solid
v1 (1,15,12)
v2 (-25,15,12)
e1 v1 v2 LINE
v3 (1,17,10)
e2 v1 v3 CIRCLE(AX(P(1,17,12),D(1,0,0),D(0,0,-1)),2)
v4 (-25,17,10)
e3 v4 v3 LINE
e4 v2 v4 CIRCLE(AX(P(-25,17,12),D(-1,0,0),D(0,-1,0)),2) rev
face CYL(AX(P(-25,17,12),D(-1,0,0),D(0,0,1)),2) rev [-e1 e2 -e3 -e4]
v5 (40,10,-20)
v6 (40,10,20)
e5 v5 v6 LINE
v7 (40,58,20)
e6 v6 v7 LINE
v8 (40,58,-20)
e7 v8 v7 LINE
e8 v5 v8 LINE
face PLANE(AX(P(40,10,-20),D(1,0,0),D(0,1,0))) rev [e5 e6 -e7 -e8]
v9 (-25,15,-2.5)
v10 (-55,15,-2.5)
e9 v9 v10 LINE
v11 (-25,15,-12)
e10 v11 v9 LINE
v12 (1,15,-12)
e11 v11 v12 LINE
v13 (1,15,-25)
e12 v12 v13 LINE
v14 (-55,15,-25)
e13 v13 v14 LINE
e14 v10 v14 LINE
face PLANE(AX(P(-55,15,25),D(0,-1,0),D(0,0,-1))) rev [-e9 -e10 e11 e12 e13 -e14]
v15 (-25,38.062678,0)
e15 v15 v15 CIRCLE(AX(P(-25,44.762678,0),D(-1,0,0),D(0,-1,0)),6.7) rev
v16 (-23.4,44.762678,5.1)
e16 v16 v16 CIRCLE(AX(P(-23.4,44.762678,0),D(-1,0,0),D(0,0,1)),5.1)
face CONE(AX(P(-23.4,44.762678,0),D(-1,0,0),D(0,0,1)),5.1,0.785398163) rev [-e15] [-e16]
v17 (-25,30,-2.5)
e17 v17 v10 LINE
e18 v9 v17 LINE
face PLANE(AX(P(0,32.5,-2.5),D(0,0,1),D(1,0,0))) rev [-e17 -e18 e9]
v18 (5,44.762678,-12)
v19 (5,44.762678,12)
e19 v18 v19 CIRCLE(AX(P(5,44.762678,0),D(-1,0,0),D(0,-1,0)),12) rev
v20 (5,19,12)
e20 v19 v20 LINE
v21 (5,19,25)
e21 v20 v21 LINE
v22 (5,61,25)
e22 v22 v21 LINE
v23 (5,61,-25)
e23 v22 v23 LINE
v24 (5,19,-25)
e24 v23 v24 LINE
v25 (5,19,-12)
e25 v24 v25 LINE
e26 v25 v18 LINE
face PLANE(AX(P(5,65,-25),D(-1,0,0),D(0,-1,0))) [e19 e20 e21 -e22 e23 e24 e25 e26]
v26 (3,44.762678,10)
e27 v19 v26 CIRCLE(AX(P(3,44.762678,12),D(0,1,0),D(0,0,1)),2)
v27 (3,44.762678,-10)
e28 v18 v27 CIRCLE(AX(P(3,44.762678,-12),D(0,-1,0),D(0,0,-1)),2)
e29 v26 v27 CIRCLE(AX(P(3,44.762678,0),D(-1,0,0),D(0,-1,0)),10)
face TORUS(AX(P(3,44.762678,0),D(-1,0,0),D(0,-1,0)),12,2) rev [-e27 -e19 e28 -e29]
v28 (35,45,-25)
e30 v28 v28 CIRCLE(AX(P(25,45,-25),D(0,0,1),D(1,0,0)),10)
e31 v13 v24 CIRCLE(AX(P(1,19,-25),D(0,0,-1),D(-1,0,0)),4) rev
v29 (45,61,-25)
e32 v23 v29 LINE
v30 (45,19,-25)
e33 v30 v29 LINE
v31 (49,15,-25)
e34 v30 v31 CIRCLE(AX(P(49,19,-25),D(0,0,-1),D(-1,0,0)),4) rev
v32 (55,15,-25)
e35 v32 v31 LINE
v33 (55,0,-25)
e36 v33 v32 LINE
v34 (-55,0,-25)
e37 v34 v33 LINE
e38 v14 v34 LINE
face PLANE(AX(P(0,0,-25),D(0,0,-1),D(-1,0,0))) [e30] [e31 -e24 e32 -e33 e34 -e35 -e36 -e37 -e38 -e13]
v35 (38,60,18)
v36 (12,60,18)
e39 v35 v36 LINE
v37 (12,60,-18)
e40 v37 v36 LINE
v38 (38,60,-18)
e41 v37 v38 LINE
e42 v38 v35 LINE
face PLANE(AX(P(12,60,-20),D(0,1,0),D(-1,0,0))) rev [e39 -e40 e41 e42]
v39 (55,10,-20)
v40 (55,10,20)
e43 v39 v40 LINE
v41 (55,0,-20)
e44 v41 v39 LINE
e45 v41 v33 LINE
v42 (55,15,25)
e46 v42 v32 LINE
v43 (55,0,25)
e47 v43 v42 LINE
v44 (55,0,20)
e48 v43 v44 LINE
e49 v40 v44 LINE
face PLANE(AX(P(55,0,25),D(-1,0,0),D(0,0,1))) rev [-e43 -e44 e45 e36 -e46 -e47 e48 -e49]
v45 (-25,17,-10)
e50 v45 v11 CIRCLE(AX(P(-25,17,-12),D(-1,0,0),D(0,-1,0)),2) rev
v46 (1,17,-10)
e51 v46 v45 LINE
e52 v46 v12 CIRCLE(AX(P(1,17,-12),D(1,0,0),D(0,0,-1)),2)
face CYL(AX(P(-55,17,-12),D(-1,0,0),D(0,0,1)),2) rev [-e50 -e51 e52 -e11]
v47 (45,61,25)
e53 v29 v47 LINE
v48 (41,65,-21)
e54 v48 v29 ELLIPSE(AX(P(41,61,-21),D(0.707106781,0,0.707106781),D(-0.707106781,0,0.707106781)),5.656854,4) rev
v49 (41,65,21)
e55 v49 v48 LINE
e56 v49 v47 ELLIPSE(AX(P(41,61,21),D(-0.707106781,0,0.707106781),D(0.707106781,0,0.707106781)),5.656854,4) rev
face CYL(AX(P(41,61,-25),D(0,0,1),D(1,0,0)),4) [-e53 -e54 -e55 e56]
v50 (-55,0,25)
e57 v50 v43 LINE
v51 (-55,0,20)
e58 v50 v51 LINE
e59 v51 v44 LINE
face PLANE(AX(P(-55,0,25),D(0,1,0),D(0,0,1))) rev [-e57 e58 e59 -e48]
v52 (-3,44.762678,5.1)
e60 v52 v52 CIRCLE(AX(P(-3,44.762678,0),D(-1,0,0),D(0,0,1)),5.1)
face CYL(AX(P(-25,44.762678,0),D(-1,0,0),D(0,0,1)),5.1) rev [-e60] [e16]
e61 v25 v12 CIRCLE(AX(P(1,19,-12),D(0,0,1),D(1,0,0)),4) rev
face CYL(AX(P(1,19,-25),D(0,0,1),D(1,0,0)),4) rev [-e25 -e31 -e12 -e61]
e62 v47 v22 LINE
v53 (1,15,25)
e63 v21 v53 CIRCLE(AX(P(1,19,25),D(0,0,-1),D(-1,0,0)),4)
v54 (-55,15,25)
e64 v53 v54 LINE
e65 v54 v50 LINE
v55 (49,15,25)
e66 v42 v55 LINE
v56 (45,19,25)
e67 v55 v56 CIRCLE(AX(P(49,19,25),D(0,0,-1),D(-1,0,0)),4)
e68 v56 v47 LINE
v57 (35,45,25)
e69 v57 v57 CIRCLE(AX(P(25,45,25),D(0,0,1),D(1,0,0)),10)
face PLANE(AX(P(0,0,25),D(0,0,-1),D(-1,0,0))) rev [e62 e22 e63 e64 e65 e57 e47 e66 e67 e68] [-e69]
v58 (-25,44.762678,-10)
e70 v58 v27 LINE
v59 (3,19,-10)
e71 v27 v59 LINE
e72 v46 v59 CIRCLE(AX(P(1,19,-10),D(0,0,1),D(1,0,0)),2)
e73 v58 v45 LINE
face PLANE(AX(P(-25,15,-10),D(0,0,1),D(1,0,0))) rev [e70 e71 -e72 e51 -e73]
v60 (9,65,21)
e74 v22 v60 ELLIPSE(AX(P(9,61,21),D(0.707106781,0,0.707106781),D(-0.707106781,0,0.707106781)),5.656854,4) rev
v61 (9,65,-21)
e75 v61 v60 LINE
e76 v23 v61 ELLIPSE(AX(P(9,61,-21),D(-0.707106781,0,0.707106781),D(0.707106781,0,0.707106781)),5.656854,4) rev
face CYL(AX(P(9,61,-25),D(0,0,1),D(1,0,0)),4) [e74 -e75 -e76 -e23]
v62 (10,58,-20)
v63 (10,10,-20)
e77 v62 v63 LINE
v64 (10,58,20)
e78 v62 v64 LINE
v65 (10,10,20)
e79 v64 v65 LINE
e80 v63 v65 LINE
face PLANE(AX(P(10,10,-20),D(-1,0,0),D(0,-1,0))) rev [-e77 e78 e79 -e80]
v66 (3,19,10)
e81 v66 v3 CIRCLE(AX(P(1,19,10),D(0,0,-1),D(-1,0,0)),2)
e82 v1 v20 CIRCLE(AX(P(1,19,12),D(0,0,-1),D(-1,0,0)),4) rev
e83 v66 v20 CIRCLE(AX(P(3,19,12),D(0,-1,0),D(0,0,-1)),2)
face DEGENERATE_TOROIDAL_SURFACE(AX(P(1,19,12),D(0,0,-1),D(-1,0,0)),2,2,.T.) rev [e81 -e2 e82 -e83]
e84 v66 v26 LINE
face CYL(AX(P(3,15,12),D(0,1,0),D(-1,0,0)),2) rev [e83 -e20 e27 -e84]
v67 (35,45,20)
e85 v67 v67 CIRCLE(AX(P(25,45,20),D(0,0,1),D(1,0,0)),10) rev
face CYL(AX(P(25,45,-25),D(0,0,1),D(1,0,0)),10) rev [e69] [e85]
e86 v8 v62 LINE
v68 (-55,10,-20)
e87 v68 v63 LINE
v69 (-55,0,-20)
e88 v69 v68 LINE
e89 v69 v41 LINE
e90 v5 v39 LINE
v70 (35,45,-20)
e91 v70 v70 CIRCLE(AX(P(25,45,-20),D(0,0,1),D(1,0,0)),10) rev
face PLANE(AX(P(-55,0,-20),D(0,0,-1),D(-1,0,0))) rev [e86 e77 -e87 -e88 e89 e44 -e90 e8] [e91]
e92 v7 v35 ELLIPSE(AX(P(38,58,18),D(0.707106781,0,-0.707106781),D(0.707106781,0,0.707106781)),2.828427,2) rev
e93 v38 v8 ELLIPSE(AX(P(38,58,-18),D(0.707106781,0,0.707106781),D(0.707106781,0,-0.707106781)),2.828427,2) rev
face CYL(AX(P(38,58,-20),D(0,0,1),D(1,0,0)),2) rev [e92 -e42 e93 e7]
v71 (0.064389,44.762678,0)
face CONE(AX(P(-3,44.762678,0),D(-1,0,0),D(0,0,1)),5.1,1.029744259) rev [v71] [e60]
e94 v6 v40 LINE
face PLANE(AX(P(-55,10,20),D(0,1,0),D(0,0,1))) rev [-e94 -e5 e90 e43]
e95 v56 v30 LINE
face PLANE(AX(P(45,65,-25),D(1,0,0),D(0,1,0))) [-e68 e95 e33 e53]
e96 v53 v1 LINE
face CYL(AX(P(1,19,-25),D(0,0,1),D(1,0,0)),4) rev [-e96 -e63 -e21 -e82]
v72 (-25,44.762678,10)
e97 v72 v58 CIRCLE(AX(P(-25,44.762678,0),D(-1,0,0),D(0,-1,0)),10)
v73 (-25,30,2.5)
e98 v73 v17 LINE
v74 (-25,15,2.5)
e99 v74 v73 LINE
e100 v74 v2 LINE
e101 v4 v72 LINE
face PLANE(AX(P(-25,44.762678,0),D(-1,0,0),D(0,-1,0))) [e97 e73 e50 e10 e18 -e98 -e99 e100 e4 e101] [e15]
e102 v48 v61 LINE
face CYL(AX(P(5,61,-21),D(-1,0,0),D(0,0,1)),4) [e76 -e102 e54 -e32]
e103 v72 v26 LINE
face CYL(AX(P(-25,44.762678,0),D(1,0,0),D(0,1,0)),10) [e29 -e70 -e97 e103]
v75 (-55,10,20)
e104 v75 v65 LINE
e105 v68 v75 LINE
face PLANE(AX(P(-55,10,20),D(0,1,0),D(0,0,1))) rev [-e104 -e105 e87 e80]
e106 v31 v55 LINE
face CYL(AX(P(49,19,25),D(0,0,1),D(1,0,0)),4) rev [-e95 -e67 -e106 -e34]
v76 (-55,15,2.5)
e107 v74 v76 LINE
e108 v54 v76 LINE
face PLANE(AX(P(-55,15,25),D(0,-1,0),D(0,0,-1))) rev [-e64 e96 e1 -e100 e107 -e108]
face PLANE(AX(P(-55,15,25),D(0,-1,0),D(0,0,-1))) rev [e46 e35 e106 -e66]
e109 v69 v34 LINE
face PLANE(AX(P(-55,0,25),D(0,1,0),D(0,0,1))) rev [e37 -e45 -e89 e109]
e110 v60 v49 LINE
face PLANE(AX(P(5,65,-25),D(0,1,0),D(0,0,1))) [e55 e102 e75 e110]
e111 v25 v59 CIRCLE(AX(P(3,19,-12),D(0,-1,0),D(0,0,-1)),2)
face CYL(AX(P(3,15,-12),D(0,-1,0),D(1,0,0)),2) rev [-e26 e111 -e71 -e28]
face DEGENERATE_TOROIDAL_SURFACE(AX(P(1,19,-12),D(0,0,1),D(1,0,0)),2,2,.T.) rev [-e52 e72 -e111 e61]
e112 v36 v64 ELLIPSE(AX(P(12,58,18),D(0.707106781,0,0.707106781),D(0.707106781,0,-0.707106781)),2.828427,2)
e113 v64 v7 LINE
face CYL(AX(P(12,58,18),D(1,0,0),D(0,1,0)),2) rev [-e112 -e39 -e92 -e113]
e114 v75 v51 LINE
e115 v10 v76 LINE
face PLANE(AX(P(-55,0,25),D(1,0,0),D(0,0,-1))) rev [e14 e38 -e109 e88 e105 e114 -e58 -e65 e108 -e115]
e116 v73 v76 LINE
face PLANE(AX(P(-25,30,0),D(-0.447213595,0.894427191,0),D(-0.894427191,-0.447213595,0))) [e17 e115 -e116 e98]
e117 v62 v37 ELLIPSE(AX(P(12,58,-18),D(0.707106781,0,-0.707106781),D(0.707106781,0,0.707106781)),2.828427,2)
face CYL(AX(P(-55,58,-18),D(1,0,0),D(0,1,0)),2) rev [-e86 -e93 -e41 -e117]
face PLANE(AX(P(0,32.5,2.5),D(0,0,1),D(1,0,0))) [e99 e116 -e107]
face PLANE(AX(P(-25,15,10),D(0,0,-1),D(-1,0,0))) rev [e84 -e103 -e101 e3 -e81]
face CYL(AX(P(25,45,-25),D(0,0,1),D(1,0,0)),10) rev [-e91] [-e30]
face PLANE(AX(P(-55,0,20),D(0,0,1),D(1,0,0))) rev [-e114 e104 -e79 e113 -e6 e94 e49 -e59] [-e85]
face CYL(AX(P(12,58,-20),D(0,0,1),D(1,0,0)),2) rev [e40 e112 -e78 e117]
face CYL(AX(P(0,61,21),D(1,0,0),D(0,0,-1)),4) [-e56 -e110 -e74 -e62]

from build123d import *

# Parameters (mm, degrees)
SKETCH1_W                         = 110
SKETCH1_H                         = 15
BOSS_EXTRUDE1_DEPTH               = 25
SKETCH2_W                         = 40
SKETCH2_H                         = 10
CUT_EXTRUDE1_DEPTH                = 114.798066767
SKETCH3_W                         = 40
SKETCH3_H                         = 50
SKETCH3_R                         = 10
BOSS_EXTRUDE2_DEPTH               = 50
FILLET1_R                         = 4
CUT_EXTRUDE2_DEPTH                = 20
FILLET2_R                         = 2
BOSS_EXTRUDE3_DEPTH               = 30
RIB2_REACH                        = 90.741
SKETCH7_WALL_W                    = 213.023413156
SKETCH7_WALL_H                    = 5
FILLET3_R                         = 2
FILLET4_R                         = 4
TAP_DRILL_FOR_M12X1_75_TAP1_D     = 10.2
TAP_DRILL_FOR_M12X1_75_TAP1_DEPTH = 22
TAP_DRILL_FOR_M12X1_75_TAP1_TIP   = 3.064389157


with BuildPart() as part:
    # Sketch1 → Boss-Extrude1 (new, symmetric)
    with BuildSketch(Plane.XY):
        with Locations((0, 7.5)):
            Rectangle(SKETCH1_W, SKETCH1_H)
    extrude(amount=BOSS_EXTRUDE1_DEPTH, both=True)

    # Sketch2 → Cut-Extrude1 (cut, through all)
    with BuildSketch(Plane(origin=(55, 0, 0), x_dir=(0, 0, -1), z_dir=(1, 0, 0))):
        with Locations((0, 5)):
            Rectangle(SKETCH2_W, SKETCH2_H)
    extrude(amount=-CUT_EXTRUDE1_DEPTH, mode=Mode.SUBTRACT)

    # Sketch3 → Boss-Extrude2 (add)
    with BuildSketch(Plane.XY.offset(25)):
        with Locations((25, 40)):
            Rectangle(SKETCH3_W, SKETCH3_H)
        with Locations((25, 45)):
            Circle(SKETCH3_R, mode=Mode.SUBTRACT)
    extrude(amount=-BOSS_EXTRUDE2_DEPTH)

    # Fillet1
    fillet1_edges = [part.edges().sort_by_distance(p)[0] for p in [
        (25, 65, -25),
        (5, 65, 0),
        (45, 65, 0),
        (45, 15, 0),
        (25, 65, 25),
    ]]
    fillet(fillet1_edges, radius=FILLET1_R)

    # Sketch5 → Cut-Extrude2 (cut, symmetric)
    with BuildSketch(Plane.XY):
        with BuildLine():
            Line((10, 10), (40, 10))
            Line((40, 10), (40, 58))
            ThreePointArc((40, 58), (39.414213562, 59.414213562), (38, 60))
            Line((38, 60), (12, 60))
            ThreePointArc((12, 60), (10.585786438, 59.414213562), (10, 58))
            Line((10, 58), (10, 10))
        make_face()
    extrude(amount=CUT_EXTRUDE2_DEPTH, both=True, mode=Mode.SUBTRACT)

    # Fillet2
    # the kernel refuses this fillet: 2 mm, written as the material it adds along each edge
    with BuildSketch(Plane(origin=(43, 60, 20), x_dir=(0, -1, 0), z_dir=(-1, 0, 0))) as fillet2_piece_1:
        with BuildLine():
            CenterArc((FILLET2_R, -FILLET2_R), FILLET2_R, 90, 90)
            Line((0, -FILLET2_R), (0, 0))
            Line((0, 0), (FILLET2_R, 0))
        make_face()
    extrude(amount=36)
    with BuildSketch(Plane(origin=(43, 60, -20), x_dir=(0, -1, 0), z_dir=(-1, 0, 0))) as fillet2_piece_2:
        with BuildLine():
            CenterArc((FILLET2_R, FILLET2_R), FILLET2_R, 180, 90)
            Line((0, FILLET2_R), (0, 0))
            Line((0, 0), (FILLET2_R, 0))
        make_face()
    extrude(amount=36)

    # Sketch6 → Boss-Extrude3 (add)
    with BuildSketch(Plane.ZY.offset(-5)):
        with BuildLine():
            Line((-10, 15), (10, 15))
            Line((10, 15), (10, 44.76267782))
            ThreePointArc((10, 44.76267782), (0, 54.76267782), (-10, 44.76267782))
            Line((-10, 44.76267782), (-10, 15))
        make_face()
    extrude(amount=BOSS_EXTRUDE3_DEPTH)

    # Sketch7 wall → Rib2 (add, up to next)
    with BuildSketch(Plane(origin=(-40, 22.5, 0), x_dir=(-0.894427191, -0.4472135955, 0), z_dir=(0.4472135955, -0.894427191, 0)), mode=Mode.PRIVATE) as rib2_sk1:
        Rectangle(SKETCH7_WALL_W, SKETCH7_WALL_H)
    rib2_tool1 = extrude(rib2_sk1.sketch, amount=RIB2_REACH, mode=Mode.PRIVATE) - part.part
    add(rib2_tool1.solids().sort_by_distance((-40, 22.5, 0))[0])

    # Fillet3
    fillet3_edges = [part.edges().sort_by_distance(p)[0] for p in [
        (5, 29.88133891, -10),
        (-10, 15, -10),
        (5, 29.88133891, 10),
        (-10, 15, 10),
        (5, 54.76267782, 0),
    ]]
    fillet(fillet3_edges, radius=FILLET3_R)

    # Fillet4
    # the kernel refuses this fillet: 4 mm, written as the material it adds along each edge
    with BuildSketch(Plane(origin=(1, 19, -10), x_dir=(0, -1, 0), z_dir=(-1, 0, 0))) as fillet4_piece_1:
        with BuildLine():
            CenterArc((2, -2), 2, 0, 90)
            Line((4, -2), (4, 0))
            Line((4, 0), (2, 0))
        make_face()
    revolve(axis=Axis((1, 19, -10), (0, 0, 1)), revolution_arc=90)
    with BuildSketch(Plane(origin=(1, 19, 10), x_dir=(1, 0, 0), z_dir=(0, 1, 0))) as fillet4_piece_2:
        with BuildLine():
            CenterArc((2, -2), 2, 0, 90)
            Line((4, -2), (4, 0))
            Line((4, 0), (2, 0))
        make_face()
    revolve(axis=Axis((1, 19, 10), (0, 0, -1)), revolution_arc=90)
    with BuildSketch(Plane(origin=(5, 15, 25), x_dir=(-1, 0, 0), z_dir=(0, 0, -1)), Plane(origin=(5, 15, -10), x_dir=(-1, 0, 0), z_dir=(0, 0, -1))) as fillet4_piece_3:
        with BuildLine():
            CenterArc((FILLET4_R, FILLET4_R), FILLET4_R, 180, 90)
            Line((0, FILLET4_R), (0, 0))
            Line((0, 0), (FILLET4_R, 0))
        make_face()
    extrude(amount=15)

    # Tap Drill for M12x1.75 Tap1
    with Locations(Plane(origin=(-25, 44.76267782, 0), x_dir=(0, -1, 0), z_dir=(-1, 0, 0))):
        with Locations((0, 0)):
            Hole(TAP_DRILL_FOR_M12X1_75_TAP1_D / 2, depth=TAP_DRILL_FOR_M12X1_75_TAP1_DEPTH)
            with Locations((0, 0, -(TAP_DRILL_FOR_M12X1_75_TAP1_DEPTH + TAP_DRILL_FOR_M12X1_75_TAP1_TIP / 2))):  # 118° drill point
                Cone(0, TAP_DRILL_FOR_M12X1_75_TAP1_D / 2, TAP_DRILL_FOR_M12X1_75_TAP1_TIP, mode=Mode.SUBTRACT)

    # Chamfer3: read off the stored shape, not the designer's step
    # Chamfer3 outline → Chamfer3 (revolve, cut)
    with BuildSketch(Plane(origin=(0, 44.76267782, 0), x_dir=(0, 1, 0), z_dir=(0, 0, -1))):
        Polygon((6.7, -25), (5.1, -23.4), (5.1, -25), align=None)
    revolve(axis=Axis((0, 44.76267782, 0), (1, 0, 0)), mode=Mode.SUBTRACT)


solid = part.part
